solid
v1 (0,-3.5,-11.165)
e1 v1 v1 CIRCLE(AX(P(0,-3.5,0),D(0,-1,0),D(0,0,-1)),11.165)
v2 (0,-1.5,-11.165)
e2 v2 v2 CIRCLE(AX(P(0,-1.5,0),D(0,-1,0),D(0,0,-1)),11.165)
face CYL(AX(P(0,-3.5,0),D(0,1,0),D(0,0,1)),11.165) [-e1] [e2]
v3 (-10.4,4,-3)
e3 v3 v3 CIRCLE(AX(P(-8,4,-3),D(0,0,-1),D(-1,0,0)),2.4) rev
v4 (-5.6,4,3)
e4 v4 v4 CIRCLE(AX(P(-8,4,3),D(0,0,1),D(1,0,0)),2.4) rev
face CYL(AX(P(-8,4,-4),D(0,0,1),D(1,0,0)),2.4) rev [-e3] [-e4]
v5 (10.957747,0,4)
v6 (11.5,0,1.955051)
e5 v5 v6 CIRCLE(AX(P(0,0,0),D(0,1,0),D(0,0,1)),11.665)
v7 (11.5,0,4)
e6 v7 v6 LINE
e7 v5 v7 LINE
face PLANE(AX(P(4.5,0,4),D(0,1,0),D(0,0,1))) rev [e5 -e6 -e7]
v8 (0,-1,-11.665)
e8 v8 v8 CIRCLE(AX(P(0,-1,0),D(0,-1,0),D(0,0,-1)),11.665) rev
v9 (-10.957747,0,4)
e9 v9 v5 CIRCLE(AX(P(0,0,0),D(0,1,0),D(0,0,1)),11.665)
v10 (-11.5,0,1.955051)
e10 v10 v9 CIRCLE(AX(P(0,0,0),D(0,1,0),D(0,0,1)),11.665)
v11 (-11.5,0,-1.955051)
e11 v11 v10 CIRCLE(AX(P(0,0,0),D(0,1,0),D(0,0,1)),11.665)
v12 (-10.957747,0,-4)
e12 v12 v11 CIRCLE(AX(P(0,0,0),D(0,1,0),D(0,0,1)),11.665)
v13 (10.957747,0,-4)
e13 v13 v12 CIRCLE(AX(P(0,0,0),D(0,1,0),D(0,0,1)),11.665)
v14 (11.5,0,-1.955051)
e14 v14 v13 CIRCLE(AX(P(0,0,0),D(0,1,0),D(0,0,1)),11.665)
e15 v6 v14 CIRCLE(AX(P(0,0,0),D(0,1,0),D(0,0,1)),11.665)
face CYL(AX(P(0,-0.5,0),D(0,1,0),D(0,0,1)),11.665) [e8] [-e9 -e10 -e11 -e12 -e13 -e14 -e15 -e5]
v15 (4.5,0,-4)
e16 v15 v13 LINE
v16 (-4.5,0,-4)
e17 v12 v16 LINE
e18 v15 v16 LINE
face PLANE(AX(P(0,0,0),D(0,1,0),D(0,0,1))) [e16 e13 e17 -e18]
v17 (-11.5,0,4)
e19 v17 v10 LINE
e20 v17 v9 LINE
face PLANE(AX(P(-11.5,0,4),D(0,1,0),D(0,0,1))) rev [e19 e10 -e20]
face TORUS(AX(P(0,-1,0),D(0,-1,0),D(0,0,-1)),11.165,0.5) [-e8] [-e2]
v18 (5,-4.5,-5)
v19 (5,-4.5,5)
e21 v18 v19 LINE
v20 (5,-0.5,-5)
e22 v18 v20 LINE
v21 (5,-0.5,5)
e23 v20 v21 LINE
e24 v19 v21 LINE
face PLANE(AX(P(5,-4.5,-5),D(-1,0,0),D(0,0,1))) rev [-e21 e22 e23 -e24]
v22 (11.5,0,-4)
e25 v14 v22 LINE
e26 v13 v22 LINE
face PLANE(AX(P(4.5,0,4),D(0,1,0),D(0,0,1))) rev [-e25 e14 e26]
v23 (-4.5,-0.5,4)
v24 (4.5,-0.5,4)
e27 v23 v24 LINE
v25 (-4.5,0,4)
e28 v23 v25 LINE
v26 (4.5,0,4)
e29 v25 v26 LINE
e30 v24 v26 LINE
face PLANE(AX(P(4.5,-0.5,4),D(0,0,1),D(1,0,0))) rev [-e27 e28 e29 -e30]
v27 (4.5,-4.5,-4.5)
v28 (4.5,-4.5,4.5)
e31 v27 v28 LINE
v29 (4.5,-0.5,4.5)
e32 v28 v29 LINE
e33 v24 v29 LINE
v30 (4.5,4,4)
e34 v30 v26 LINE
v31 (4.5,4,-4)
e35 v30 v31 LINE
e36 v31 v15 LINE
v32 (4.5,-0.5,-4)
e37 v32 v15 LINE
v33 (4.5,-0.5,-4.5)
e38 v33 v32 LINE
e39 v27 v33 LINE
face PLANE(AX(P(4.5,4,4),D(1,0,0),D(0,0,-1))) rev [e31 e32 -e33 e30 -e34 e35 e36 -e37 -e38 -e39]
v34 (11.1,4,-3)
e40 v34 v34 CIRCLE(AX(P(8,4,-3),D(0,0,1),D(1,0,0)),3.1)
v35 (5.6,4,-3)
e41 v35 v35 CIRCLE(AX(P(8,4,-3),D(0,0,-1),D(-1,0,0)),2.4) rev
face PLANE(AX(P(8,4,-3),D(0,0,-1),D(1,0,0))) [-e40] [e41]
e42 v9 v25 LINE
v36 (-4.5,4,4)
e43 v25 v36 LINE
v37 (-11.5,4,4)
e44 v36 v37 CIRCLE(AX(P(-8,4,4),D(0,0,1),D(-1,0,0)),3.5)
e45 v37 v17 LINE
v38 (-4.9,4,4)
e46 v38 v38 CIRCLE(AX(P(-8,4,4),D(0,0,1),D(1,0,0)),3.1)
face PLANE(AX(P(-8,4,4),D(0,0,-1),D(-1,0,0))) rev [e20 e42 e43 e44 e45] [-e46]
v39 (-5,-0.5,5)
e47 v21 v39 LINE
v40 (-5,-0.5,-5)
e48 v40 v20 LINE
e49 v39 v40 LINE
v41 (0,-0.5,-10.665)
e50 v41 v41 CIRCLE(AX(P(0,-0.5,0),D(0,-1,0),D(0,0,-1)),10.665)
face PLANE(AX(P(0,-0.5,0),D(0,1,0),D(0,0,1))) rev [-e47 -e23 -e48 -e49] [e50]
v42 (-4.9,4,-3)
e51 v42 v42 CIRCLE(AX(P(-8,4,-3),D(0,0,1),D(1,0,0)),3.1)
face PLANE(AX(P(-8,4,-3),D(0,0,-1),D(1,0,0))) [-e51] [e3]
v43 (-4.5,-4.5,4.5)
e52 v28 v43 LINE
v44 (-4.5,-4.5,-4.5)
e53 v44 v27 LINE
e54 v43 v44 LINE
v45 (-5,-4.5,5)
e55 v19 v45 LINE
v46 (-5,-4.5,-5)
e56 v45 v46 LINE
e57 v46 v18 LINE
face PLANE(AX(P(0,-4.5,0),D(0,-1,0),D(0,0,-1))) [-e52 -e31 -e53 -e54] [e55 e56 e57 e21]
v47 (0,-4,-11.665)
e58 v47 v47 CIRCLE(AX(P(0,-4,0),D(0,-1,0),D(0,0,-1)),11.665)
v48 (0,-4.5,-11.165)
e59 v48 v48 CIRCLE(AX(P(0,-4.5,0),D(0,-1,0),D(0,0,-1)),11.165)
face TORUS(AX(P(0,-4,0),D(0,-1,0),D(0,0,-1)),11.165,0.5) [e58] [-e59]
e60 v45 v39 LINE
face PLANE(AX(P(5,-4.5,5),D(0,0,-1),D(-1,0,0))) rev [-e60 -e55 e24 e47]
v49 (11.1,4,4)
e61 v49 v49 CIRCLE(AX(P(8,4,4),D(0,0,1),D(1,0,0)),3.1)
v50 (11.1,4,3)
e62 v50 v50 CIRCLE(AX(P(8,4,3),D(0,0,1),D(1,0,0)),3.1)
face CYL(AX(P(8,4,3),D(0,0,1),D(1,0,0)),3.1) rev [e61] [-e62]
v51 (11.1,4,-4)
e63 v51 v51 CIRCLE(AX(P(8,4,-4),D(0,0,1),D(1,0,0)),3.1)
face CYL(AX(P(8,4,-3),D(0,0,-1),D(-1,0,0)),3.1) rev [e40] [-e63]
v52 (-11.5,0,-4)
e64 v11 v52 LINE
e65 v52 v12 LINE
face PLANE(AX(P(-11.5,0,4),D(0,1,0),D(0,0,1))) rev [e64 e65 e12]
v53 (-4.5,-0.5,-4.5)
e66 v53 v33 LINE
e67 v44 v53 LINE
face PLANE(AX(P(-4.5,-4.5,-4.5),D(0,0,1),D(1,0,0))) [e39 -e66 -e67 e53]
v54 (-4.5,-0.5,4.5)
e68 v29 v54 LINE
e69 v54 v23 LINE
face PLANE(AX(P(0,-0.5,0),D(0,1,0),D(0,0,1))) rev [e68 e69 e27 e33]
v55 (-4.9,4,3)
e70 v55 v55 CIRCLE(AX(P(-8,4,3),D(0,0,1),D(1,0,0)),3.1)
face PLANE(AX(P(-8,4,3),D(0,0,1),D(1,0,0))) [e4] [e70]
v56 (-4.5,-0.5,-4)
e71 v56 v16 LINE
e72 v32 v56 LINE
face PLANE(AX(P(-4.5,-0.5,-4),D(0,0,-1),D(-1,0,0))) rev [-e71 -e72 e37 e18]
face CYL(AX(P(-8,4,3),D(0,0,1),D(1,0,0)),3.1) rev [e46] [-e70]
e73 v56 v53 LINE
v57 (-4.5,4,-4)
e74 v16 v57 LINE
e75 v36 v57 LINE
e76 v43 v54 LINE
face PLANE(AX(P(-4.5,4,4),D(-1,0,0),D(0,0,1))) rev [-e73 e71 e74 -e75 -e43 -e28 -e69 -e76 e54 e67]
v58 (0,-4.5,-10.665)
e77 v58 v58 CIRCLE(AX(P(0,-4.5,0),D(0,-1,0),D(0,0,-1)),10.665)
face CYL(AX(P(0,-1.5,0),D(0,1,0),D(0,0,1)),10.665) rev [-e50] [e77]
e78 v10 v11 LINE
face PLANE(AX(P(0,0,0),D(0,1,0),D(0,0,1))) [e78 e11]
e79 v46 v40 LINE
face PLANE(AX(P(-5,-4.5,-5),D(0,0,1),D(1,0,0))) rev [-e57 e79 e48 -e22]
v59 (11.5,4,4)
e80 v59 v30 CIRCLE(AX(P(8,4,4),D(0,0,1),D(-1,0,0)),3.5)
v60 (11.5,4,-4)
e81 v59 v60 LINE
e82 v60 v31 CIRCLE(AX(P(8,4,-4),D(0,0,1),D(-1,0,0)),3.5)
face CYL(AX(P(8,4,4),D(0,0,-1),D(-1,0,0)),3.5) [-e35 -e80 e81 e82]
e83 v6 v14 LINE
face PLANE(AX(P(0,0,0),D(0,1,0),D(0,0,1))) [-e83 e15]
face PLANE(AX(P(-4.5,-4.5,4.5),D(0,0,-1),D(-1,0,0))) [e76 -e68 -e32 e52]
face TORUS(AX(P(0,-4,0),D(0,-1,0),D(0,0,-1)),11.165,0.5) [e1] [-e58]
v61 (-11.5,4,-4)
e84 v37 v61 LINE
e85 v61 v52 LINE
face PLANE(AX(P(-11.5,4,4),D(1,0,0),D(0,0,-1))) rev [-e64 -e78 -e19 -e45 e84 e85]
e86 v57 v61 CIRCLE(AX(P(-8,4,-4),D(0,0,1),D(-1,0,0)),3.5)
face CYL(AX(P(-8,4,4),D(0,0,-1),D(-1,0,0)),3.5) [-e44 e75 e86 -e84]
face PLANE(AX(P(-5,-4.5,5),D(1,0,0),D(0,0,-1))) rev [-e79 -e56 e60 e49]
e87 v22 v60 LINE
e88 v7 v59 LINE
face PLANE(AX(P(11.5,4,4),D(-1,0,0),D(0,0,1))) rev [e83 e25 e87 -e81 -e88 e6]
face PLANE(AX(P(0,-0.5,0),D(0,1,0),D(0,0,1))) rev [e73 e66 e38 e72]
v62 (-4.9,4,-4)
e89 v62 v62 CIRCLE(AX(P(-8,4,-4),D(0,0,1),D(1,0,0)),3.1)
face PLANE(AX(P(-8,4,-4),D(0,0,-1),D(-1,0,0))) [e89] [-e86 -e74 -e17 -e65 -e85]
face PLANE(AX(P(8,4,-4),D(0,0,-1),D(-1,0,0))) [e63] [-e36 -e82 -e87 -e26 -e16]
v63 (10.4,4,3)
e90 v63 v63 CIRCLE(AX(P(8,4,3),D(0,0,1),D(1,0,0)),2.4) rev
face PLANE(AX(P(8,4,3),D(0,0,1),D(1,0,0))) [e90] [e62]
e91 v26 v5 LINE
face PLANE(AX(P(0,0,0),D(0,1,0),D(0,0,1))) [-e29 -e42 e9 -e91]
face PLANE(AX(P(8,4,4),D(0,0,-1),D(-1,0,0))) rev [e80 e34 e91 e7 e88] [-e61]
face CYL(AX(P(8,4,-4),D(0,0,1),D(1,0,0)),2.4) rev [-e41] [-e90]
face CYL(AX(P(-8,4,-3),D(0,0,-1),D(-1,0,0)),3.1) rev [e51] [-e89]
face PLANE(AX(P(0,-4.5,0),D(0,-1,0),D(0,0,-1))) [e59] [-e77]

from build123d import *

# Parameters (mm, degrees)
BOSS_EXTRUDE1_DEPTH   = 4
BOSS_EXTRUDE1_2_DEPTH = 4
SKETCH7_R             = 2.4
CUT_EXTRUDE1_DEPTH    = 8
SKETCH8_R             = 3.1
CUT_EXTRUDE2_DEPTH    = 1
SKETCH9_R             = 2.4
CUT_EXTRUDE3_DEPTH    = 8
SKETCH10_R            = 3.1
CUT_EXTRUDE4_DEPTH    = 1
SKETCH11_R            = 11.665
BOSS_EXTRUDE2_DEPTH   = 0.5
SKETCH13_R            = 11.665
SKETCH13_R_2          = 10.665
BOSS_EXTRUDE3_DEPTH   = 1
SKETCH14_R            = 11.165
SKETCH14_R_2          = 10.665
BOSS_EXTRUDE4_DEPTH   = 2
SKETCH15_R            = 11.665
SKETCH15_R_2          = 10.665
BOSS_EXTRUDE5_DEPTH   = 1
FILLET1_R             = 0.5
FILLET2_R             = 0.5
FILLET3_R             = 0.5
SKETCH16_W            = 9
SKETCH16_H            = 8
CUT_EXTRUDE5_DEPTH    = 0.5
SKETCH18_W            = 10
SKETCH18_H            = 10
SKETCH18_W_2          = 9
SKETCH18_H_2          = 9
BOSS_EXTRUDE6_DEPTH   = 4


with BuildPart() as part:
    # Sketch6 → Boss-Extrude1 (new, symmetric)
    with BuildSketch(Plane.XY):
        with BuildLine():
            Line((-11.5, 4), (-11.5, 0))
            Line((-11.5, 0), (-4.5, 0))
            Line((-4.5, 0), (-4.5, 4))
            ThreePointArc((-4.5, 4), (-8, 7.5), (-11.5, 4))
        make_face()
    extrude(amount=BOSS_EXTRUDE1_DEPTH, both=True)

    # Sketch7 → Cut-Extrude1 (cut)
    with BuildSketch(Plane.XY.offset(4)):
        with Locations((-8, 4)):
            Circle(SKETCH7_R)
    extrude(amount=-CUT_EXTRUDE1_DEPTH, mode=Mode.SUBTRACT)

    # Sketch8 → Cut-Extrude2 (cut)
    with BuildSketch(Plane.XY.offset(4)):
        with Locations((-8, 4)):
            Circle(SKETCH8_R)
    cut_extrude2 = extrude(amount=-CUT_EXTRUDE2_DEPTH, mode=Mode.SUBTRACT)

    # Mirror1: Cut-Extrude2 across plane
    add(cut_extrude2.mirror(Plane.XY), mode=Mode.SUBTRACT)



with BuildPart() as body_2:
    # Sketch6 → Boss-Extrude1 2 (new, symmetric)
    with BuildSketch(Plane.XY):
        with BuildLine():
            Line((4.5, 4), (4.5, 0))
            Line((4.5, 0), (11.5, 0))
            Line((11.5, 0), (11.5, 4))
            ThreePointArc((11.5, 4), (8, 7.5), (4.5, 4))
        make_face()
    extrude(amount=BOSS_EXTRUDE1_2_DEPTH, both=True)

    # Sketch9 → Cut-Extrude3 (cut)
    with BuildSketch(Plane.XY.offset(4)):
        with Locations((8, 4)):
            Circle(SKETCH9_R)
    extrude(amount=-CUT_EXTRUDE3_DEPTH, mode=Mode.SUBTRACT)

    # Sketch10 → Cut-Extrude4 (cut)
    with BuildSketch(Plane.XY.offset(4)):
        with Locations((8, 4)):
            Circle(SKETCH10_R)
    cut_extrude4 = extrude(amount=-CUT_EXTRUDE4_DEPTH, mode=Mode.SUBTRACT)

    # Mirror3: Cut-Extrude4 across plane
    add(cut_extrude4.mirror(Plane.XY), mode=Mode.SUBTRACT)


with BuildPart() as part_1:
    add(part.part)

    add(body_2.part)  # Boss-Extrude2 merges body 2
    # Sketch11 → Boss-Extrude2 (add)
    with BuildSketch(Plane(origin=(0, 0, 0), x_dir=(1, 0, 0), z_dir=(0, 1, 0))):
        with Locations(Location((0, 0, 0), (0, 0, 270))):
            Circle(SKETCH11_R)
    extrude(amount=-BOSS_EXTRUDE2_DEPTH)

    # Sketch13 → Boss-Extrude3 (add)
    with BuildSketch(Plane.XZ.offset(0.5)):
        with Locations(Location((0, 0, 0), (0, 0, 20.054030419))):
            Circle(SKETCH13_R)
        with Locations(Location((0, 0, 0), (0, 0, 270))):
            Circle(SKETCH13_R_2, mode=Mode.SUBTRACT)
    extrude(amount=BOSS_EXTRUDE3_DEPTH)

    # Sketch14 → Boss-Extrude4 (add)
    with BuildSketch(Plane.XZ.offset(1.5)):
        with Locations(Location((0, 0, 0), (0, 0, 270))):
            Circle(SKETCH14_R)
        with Locations(Location((0, 0, 0), (0, 0, 270))):
            Circle(SKETCH14_R_2, mode=Mode.SUBTRACT)
    extrude(amount=BOSS_EXTRUDE4_DEPTH)

    # Sketch15 → Boss-Extrude5 (add)
    with BuildSketch(Plane.XZ.offset(3.5)):
        with Locations(Location((0, 0, 0), (0, 0, 20.054030419))):
            Circle(SKETCH15_R)
        with Locations(Location((0, 0, 0), (0, 0, 270))):
            Circle(SKETCH15_R_2, mode=Mode.SUBTRACT)
    extrude(amount=BOSS_EXTRUDE5_DEPTH)

    # Fillet1
    fillet1_edges = [part_1.edges().sort_by_distance(p)[0] for p in [
        (-10.957747259, -3.5, -4),
    ]]
    fillet(fillet1_edges, radius=FILLET1_R - 0.0001)  # a hair under: the kernel refuses the full size

    # Fillet2
    fillet2_edges = [part_1.edges().sort_by_distance(p)[0] for p in [
        (-10.957747259, -4.5, -4),
    ]]
    fillet(fillet2_edges, radius=FILLET2_R)

    # Fillet3
    fillet3_edges = [part_1.edges().sort_by_distance(p)[0] for p in [
        (-10.957747259, -1.5, -4),
    ]]
    fillet(fillet3_edges, radius=FILLET3_R - 0.0001)  # a hair under: the kernel refuses the full size

    # Sketch16 → Cut-Extrude5 (cut)
    with BuildSketch(Plane(origin=(0, 0, 0), x_dir=(1, 0, 0), z_dir=(0, 1, 0))):
        Rectangle(SKETCH16_W, SKETCH16_H)
    extrude(amount=-CUT_EXTRUDE5_DEPTH, mode=Mode.SUBTRACT)

    # Sketch18 → Boss-Extrude6 (add)
    with BuildSketch(Plane.XZ.offset(0.5)):
        Rectangle(SKETCH18_W, SKETCH18_H)
        Rectangle(SKETCH18_W_2, SKETCH18_H_2, mode=Mode.SUBTRACT)
    extrude(amount=BOSS_EXTRUDE6_DEPTH)


solid = part_1.part
